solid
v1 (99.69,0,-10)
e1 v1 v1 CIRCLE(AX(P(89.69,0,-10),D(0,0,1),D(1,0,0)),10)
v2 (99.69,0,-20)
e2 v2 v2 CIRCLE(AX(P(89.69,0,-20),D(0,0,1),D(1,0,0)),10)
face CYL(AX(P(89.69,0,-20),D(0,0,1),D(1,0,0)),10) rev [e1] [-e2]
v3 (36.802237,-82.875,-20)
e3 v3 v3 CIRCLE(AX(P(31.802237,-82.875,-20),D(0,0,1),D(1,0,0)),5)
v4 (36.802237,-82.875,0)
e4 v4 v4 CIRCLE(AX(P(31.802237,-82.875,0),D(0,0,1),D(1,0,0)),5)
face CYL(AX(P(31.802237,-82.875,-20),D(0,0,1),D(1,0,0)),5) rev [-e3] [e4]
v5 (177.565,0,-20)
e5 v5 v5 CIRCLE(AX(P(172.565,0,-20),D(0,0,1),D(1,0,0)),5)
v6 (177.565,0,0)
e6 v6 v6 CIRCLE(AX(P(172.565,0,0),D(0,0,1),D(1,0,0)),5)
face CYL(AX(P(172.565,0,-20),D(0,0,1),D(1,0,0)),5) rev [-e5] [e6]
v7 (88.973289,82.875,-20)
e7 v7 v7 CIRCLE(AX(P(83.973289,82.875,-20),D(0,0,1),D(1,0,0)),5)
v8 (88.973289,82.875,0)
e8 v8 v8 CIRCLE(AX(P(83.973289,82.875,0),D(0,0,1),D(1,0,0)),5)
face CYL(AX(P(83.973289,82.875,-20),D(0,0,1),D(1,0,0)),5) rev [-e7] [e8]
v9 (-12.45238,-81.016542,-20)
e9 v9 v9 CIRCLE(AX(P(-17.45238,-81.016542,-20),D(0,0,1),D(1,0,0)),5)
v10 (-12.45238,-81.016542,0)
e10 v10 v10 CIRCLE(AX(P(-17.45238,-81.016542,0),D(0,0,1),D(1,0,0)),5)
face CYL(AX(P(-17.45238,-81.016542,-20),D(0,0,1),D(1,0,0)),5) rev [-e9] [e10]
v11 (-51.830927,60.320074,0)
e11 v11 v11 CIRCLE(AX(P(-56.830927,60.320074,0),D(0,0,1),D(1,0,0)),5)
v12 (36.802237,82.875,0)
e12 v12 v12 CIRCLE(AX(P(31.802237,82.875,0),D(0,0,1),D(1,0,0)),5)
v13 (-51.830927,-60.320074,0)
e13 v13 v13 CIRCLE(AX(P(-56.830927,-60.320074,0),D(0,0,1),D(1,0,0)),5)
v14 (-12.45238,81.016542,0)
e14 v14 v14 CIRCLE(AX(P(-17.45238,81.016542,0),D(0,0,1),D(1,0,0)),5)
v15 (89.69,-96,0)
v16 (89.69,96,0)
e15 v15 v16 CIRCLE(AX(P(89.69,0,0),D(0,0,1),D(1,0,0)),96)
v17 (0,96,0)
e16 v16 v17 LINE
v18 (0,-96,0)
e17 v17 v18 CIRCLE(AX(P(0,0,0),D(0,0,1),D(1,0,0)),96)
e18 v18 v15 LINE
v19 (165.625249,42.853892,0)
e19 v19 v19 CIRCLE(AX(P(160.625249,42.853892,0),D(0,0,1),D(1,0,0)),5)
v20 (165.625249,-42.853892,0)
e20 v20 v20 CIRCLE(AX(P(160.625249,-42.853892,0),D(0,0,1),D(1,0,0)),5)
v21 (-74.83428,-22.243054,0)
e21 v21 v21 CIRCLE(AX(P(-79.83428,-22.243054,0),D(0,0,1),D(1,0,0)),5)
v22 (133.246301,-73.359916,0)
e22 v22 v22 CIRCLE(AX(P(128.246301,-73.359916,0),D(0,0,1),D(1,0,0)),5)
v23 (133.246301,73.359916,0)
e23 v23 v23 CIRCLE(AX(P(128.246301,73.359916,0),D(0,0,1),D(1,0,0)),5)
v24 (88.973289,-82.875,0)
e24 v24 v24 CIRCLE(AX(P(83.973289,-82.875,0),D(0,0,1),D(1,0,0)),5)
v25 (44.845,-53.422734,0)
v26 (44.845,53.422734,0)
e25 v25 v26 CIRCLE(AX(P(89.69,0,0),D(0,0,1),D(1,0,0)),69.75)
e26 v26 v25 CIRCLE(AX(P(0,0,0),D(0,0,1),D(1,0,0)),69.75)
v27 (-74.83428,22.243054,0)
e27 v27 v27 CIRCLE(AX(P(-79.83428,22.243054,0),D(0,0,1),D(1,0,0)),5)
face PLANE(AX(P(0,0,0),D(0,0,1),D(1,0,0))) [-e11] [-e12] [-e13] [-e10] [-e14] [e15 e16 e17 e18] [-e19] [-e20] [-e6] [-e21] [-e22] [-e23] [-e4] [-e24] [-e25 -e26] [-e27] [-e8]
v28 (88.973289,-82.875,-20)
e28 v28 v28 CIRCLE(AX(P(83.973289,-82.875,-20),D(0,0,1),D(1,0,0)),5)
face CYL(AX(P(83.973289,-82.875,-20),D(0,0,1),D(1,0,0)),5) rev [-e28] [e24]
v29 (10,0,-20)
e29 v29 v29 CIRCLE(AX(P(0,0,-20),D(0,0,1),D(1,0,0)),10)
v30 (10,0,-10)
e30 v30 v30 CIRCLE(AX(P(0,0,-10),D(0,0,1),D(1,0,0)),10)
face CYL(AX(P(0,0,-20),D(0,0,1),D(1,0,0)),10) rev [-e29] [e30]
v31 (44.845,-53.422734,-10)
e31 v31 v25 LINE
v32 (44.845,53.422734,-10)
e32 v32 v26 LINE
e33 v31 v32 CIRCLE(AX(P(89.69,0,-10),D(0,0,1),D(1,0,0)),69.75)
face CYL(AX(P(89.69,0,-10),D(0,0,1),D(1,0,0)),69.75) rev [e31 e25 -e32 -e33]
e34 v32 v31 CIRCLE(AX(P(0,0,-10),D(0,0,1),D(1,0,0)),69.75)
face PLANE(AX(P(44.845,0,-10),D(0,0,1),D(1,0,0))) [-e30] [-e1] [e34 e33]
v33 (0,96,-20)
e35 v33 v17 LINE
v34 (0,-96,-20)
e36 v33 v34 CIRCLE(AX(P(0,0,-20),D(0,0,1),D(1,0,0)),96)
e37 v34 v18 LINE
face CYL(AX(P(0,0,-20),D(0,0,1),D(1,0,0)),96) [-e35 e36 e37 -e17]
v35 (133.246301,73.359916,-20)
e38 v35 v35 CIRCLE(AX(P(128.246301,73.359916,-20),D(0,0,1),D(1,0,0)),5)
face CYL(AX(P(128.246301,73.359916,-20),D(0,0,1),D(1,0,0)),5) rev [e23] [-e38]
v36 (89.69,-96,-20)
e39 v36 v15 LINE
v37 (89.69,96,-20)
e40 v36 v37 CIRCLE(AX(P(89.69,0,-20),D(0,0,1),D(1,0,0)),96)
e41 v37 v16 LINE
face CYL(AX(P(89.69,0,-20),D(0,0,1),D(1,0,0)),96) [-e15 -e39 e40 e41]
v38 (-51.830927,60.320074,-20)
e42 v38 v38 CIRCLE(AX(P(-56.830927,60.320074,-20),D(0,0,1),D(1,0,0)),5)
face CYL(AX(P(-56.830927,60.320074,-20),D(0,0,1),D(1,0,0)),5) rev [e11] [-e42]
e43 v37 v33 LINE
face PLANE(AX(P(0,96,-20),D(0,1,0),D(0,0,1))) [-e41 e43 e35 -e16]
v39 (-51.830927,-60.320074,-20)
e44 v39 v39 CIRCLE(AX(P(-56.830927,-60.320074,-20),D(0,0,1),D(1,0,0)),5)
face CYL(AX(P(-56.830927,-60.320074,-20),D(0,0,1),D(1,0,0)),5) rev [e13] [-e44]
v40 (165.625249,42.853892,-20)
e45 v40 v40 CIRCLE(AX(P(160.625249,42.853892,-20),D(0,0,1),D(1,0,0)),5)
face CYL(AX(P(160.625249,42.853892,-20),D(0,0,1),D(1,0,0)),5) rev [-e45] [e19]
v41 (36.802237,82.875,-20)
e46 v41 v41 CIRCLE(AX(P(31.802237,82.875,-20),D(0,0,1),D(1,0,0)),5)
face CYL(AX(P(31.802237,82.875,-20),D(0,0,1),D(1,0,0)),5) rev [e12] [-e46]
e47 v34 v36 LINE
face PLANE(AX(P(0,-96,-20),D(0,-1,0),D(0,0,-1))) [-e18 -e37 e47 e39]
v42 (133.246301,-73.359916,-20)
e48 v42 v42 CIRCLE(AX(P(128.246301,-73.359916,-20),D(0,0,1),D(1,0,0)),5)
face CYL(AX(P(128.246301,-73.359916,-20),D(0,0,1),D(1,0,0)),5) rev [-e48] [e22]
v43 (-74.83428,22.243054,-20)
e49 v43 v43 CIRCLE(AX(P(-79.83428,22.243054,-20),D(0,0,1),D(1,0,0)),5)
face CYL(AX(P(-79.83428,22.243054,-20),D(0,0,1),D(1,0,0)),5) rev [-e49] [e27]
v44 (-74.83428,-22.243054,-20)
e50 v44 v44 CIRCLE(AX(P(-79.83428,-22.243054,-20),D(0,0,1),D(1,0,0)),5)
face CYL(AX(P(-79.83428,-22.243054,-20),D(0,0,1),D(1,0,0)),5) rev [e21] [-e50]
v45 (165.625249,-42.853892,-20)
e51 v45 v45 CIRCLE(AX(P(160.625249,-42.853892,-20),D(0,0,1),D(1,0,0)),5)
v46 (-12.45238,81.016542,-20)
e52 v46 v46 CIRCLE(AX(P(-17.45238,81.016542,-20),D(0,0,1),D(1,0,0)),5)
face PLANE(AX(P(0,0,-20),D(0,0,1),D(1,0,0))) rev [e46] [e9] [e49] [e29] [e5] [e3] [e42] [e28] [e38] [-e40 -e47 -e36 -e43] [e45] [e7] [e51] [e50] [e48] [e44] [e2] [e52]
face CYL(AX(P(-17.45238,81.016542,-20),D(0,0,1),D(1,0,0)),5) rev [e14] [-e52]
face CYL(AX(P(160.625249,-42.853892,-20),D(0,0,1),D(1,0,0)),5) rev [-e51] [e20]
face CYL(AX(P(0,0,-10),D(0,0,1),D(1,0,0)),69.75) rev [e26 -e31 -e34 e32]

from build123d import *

# Parameters (mm, degrees)
BOSS_EXTRUDE1_DEPTH   = 20
CUT_EXTRUDE1_DEPTH    = 10
SKETCH3_R             = 10
CUT_EXTRUDE2_DEPTH    = 210.276793028
SKETCH4_R             = 5
CUT_EXTRUDE3_DEPTH    = 210.992323907
CRVPATTERN1_START     = -20
CRVPATTERN1_OUTLINE_R = 5
CRVPATTERN1_DEPTH     = 20


# Read off the part's stored shape, not the designer's step: CrvPattern1
with BuildPart() as part:
    # Sketch1 → Boss-Extrude1 (new body)
    with BuildSketch(Plane.XY):
        with BuildLine():
            Line((0, 96), (89.69, 96))
            ThreePointArc((89.69, 96), (185.69, 0), (89.69, -96))
            Line((89.69, -96), (0, -96))
            ThreePointArc((0, -96), (-96, 0), (0, 96))
        make_face()
    extrude(amount=-BOSS_EXTRUDE1_DEPTH)

    # Sketch2 → Cut-Extrude1 (cut)
    with BuildSketch(Plane.XY):
        with BuildLine():
            ThreePointArc((44.845, 53.422733691), (-69.75, 0), (44.845, -53.422733691))
            ThreePointArc((44.845, -53.422733691), (159.44, 0), (44.845, 53.422733691))
        make_face()
    extrude(amount=-CUT_EXTRUDE1_DEPTH, mode=Mode.SUBTRACT)

    # Sketch3 → Cut-Extrude2 (cut, through all)
    with BuildSketch(Plane.XY.offset(-10)):
        Circle(SKETCH3_R)
        with Locations((89.69, 0)):
            Circle(SKETCH3_R)
    extrude(amount=-CUT_EXTRUDE2_DEPTH, mode=Mode.SUBTRACT)

    # Sketch4 → Cut-Extrude3 (cut, through all)
    with BuildSketch(Plane.XY):
        with Locations((172.565, 0)):
            Circle(SKETCH4_R)
    extrude(amount=-CUT_EXTRUDE3_DEPTH, mode=Mode.SUBTRACT)

    # CrvPattern1 outline → CrvPattern1 (cut)
    with BuildSketch(Plane.XY.offset(CRVPATTERN1_START)):
        with Locations((160.625248894, 42.853892348)):
            Circle(CRVPATTERN1_OUTLINE_R)
        with Locations((160.625248894, -42.853892348)):
            Circle(CRVPATTERN1_OUTLINE_R)
        with Locations((128.24630101, -73.359916013)):
            Circle(CRVPATTERN1_OUTLINE_R)
        with Locations((83.973289474, -82.875)):
            Circle(CRVPATTERN1_OUTLINE_R)
        with Locations((31.802236842, -82.875)):
            Circle(CRVPATTERN1_OUTLINE_R)
        with Locations((-17.452379652, -81.01654195)):
            Circle(CRVPATTERN1_OUTLINE_R)
        with Locations((-56.830926836, -60.320074436)):
            Circle(CRVPATTERN1_OUTLINE_R)
        with Locations((-79.834279533, -22.243053668)):
            Circle(CRVPATTERN1_OUTLINE_R)
        with Locations((-79.834279533, 22.243053668)):
            Circle(CRVPATTERN1_OUTLINE_R)
        with Locations((-56.830926836, 60.320074436)):
            Circle(CRVPATTERN1_OUTLINE_R)
        with Locations((-17.452379652, 81.01654195)):
            Circle(CRVPATTERN1_OUTLINE_R)
        with Locations((31.802236842, 82.875)):
            Circle(CRVPATTERN1_OUTLINE_R)
        with Locations((83.973289474, 82.875)):
            Circle(CRVPATTERN1_OUTLINE_R)
        with Locations((128.24630101, 73.359916013)):
            Circle(CRVPATTERN1_OUTLINE_R)
    extrude(amount=CRVPATTERN1_DEPTH, mode=Mode.SUBTRACT)


solid = part.part
